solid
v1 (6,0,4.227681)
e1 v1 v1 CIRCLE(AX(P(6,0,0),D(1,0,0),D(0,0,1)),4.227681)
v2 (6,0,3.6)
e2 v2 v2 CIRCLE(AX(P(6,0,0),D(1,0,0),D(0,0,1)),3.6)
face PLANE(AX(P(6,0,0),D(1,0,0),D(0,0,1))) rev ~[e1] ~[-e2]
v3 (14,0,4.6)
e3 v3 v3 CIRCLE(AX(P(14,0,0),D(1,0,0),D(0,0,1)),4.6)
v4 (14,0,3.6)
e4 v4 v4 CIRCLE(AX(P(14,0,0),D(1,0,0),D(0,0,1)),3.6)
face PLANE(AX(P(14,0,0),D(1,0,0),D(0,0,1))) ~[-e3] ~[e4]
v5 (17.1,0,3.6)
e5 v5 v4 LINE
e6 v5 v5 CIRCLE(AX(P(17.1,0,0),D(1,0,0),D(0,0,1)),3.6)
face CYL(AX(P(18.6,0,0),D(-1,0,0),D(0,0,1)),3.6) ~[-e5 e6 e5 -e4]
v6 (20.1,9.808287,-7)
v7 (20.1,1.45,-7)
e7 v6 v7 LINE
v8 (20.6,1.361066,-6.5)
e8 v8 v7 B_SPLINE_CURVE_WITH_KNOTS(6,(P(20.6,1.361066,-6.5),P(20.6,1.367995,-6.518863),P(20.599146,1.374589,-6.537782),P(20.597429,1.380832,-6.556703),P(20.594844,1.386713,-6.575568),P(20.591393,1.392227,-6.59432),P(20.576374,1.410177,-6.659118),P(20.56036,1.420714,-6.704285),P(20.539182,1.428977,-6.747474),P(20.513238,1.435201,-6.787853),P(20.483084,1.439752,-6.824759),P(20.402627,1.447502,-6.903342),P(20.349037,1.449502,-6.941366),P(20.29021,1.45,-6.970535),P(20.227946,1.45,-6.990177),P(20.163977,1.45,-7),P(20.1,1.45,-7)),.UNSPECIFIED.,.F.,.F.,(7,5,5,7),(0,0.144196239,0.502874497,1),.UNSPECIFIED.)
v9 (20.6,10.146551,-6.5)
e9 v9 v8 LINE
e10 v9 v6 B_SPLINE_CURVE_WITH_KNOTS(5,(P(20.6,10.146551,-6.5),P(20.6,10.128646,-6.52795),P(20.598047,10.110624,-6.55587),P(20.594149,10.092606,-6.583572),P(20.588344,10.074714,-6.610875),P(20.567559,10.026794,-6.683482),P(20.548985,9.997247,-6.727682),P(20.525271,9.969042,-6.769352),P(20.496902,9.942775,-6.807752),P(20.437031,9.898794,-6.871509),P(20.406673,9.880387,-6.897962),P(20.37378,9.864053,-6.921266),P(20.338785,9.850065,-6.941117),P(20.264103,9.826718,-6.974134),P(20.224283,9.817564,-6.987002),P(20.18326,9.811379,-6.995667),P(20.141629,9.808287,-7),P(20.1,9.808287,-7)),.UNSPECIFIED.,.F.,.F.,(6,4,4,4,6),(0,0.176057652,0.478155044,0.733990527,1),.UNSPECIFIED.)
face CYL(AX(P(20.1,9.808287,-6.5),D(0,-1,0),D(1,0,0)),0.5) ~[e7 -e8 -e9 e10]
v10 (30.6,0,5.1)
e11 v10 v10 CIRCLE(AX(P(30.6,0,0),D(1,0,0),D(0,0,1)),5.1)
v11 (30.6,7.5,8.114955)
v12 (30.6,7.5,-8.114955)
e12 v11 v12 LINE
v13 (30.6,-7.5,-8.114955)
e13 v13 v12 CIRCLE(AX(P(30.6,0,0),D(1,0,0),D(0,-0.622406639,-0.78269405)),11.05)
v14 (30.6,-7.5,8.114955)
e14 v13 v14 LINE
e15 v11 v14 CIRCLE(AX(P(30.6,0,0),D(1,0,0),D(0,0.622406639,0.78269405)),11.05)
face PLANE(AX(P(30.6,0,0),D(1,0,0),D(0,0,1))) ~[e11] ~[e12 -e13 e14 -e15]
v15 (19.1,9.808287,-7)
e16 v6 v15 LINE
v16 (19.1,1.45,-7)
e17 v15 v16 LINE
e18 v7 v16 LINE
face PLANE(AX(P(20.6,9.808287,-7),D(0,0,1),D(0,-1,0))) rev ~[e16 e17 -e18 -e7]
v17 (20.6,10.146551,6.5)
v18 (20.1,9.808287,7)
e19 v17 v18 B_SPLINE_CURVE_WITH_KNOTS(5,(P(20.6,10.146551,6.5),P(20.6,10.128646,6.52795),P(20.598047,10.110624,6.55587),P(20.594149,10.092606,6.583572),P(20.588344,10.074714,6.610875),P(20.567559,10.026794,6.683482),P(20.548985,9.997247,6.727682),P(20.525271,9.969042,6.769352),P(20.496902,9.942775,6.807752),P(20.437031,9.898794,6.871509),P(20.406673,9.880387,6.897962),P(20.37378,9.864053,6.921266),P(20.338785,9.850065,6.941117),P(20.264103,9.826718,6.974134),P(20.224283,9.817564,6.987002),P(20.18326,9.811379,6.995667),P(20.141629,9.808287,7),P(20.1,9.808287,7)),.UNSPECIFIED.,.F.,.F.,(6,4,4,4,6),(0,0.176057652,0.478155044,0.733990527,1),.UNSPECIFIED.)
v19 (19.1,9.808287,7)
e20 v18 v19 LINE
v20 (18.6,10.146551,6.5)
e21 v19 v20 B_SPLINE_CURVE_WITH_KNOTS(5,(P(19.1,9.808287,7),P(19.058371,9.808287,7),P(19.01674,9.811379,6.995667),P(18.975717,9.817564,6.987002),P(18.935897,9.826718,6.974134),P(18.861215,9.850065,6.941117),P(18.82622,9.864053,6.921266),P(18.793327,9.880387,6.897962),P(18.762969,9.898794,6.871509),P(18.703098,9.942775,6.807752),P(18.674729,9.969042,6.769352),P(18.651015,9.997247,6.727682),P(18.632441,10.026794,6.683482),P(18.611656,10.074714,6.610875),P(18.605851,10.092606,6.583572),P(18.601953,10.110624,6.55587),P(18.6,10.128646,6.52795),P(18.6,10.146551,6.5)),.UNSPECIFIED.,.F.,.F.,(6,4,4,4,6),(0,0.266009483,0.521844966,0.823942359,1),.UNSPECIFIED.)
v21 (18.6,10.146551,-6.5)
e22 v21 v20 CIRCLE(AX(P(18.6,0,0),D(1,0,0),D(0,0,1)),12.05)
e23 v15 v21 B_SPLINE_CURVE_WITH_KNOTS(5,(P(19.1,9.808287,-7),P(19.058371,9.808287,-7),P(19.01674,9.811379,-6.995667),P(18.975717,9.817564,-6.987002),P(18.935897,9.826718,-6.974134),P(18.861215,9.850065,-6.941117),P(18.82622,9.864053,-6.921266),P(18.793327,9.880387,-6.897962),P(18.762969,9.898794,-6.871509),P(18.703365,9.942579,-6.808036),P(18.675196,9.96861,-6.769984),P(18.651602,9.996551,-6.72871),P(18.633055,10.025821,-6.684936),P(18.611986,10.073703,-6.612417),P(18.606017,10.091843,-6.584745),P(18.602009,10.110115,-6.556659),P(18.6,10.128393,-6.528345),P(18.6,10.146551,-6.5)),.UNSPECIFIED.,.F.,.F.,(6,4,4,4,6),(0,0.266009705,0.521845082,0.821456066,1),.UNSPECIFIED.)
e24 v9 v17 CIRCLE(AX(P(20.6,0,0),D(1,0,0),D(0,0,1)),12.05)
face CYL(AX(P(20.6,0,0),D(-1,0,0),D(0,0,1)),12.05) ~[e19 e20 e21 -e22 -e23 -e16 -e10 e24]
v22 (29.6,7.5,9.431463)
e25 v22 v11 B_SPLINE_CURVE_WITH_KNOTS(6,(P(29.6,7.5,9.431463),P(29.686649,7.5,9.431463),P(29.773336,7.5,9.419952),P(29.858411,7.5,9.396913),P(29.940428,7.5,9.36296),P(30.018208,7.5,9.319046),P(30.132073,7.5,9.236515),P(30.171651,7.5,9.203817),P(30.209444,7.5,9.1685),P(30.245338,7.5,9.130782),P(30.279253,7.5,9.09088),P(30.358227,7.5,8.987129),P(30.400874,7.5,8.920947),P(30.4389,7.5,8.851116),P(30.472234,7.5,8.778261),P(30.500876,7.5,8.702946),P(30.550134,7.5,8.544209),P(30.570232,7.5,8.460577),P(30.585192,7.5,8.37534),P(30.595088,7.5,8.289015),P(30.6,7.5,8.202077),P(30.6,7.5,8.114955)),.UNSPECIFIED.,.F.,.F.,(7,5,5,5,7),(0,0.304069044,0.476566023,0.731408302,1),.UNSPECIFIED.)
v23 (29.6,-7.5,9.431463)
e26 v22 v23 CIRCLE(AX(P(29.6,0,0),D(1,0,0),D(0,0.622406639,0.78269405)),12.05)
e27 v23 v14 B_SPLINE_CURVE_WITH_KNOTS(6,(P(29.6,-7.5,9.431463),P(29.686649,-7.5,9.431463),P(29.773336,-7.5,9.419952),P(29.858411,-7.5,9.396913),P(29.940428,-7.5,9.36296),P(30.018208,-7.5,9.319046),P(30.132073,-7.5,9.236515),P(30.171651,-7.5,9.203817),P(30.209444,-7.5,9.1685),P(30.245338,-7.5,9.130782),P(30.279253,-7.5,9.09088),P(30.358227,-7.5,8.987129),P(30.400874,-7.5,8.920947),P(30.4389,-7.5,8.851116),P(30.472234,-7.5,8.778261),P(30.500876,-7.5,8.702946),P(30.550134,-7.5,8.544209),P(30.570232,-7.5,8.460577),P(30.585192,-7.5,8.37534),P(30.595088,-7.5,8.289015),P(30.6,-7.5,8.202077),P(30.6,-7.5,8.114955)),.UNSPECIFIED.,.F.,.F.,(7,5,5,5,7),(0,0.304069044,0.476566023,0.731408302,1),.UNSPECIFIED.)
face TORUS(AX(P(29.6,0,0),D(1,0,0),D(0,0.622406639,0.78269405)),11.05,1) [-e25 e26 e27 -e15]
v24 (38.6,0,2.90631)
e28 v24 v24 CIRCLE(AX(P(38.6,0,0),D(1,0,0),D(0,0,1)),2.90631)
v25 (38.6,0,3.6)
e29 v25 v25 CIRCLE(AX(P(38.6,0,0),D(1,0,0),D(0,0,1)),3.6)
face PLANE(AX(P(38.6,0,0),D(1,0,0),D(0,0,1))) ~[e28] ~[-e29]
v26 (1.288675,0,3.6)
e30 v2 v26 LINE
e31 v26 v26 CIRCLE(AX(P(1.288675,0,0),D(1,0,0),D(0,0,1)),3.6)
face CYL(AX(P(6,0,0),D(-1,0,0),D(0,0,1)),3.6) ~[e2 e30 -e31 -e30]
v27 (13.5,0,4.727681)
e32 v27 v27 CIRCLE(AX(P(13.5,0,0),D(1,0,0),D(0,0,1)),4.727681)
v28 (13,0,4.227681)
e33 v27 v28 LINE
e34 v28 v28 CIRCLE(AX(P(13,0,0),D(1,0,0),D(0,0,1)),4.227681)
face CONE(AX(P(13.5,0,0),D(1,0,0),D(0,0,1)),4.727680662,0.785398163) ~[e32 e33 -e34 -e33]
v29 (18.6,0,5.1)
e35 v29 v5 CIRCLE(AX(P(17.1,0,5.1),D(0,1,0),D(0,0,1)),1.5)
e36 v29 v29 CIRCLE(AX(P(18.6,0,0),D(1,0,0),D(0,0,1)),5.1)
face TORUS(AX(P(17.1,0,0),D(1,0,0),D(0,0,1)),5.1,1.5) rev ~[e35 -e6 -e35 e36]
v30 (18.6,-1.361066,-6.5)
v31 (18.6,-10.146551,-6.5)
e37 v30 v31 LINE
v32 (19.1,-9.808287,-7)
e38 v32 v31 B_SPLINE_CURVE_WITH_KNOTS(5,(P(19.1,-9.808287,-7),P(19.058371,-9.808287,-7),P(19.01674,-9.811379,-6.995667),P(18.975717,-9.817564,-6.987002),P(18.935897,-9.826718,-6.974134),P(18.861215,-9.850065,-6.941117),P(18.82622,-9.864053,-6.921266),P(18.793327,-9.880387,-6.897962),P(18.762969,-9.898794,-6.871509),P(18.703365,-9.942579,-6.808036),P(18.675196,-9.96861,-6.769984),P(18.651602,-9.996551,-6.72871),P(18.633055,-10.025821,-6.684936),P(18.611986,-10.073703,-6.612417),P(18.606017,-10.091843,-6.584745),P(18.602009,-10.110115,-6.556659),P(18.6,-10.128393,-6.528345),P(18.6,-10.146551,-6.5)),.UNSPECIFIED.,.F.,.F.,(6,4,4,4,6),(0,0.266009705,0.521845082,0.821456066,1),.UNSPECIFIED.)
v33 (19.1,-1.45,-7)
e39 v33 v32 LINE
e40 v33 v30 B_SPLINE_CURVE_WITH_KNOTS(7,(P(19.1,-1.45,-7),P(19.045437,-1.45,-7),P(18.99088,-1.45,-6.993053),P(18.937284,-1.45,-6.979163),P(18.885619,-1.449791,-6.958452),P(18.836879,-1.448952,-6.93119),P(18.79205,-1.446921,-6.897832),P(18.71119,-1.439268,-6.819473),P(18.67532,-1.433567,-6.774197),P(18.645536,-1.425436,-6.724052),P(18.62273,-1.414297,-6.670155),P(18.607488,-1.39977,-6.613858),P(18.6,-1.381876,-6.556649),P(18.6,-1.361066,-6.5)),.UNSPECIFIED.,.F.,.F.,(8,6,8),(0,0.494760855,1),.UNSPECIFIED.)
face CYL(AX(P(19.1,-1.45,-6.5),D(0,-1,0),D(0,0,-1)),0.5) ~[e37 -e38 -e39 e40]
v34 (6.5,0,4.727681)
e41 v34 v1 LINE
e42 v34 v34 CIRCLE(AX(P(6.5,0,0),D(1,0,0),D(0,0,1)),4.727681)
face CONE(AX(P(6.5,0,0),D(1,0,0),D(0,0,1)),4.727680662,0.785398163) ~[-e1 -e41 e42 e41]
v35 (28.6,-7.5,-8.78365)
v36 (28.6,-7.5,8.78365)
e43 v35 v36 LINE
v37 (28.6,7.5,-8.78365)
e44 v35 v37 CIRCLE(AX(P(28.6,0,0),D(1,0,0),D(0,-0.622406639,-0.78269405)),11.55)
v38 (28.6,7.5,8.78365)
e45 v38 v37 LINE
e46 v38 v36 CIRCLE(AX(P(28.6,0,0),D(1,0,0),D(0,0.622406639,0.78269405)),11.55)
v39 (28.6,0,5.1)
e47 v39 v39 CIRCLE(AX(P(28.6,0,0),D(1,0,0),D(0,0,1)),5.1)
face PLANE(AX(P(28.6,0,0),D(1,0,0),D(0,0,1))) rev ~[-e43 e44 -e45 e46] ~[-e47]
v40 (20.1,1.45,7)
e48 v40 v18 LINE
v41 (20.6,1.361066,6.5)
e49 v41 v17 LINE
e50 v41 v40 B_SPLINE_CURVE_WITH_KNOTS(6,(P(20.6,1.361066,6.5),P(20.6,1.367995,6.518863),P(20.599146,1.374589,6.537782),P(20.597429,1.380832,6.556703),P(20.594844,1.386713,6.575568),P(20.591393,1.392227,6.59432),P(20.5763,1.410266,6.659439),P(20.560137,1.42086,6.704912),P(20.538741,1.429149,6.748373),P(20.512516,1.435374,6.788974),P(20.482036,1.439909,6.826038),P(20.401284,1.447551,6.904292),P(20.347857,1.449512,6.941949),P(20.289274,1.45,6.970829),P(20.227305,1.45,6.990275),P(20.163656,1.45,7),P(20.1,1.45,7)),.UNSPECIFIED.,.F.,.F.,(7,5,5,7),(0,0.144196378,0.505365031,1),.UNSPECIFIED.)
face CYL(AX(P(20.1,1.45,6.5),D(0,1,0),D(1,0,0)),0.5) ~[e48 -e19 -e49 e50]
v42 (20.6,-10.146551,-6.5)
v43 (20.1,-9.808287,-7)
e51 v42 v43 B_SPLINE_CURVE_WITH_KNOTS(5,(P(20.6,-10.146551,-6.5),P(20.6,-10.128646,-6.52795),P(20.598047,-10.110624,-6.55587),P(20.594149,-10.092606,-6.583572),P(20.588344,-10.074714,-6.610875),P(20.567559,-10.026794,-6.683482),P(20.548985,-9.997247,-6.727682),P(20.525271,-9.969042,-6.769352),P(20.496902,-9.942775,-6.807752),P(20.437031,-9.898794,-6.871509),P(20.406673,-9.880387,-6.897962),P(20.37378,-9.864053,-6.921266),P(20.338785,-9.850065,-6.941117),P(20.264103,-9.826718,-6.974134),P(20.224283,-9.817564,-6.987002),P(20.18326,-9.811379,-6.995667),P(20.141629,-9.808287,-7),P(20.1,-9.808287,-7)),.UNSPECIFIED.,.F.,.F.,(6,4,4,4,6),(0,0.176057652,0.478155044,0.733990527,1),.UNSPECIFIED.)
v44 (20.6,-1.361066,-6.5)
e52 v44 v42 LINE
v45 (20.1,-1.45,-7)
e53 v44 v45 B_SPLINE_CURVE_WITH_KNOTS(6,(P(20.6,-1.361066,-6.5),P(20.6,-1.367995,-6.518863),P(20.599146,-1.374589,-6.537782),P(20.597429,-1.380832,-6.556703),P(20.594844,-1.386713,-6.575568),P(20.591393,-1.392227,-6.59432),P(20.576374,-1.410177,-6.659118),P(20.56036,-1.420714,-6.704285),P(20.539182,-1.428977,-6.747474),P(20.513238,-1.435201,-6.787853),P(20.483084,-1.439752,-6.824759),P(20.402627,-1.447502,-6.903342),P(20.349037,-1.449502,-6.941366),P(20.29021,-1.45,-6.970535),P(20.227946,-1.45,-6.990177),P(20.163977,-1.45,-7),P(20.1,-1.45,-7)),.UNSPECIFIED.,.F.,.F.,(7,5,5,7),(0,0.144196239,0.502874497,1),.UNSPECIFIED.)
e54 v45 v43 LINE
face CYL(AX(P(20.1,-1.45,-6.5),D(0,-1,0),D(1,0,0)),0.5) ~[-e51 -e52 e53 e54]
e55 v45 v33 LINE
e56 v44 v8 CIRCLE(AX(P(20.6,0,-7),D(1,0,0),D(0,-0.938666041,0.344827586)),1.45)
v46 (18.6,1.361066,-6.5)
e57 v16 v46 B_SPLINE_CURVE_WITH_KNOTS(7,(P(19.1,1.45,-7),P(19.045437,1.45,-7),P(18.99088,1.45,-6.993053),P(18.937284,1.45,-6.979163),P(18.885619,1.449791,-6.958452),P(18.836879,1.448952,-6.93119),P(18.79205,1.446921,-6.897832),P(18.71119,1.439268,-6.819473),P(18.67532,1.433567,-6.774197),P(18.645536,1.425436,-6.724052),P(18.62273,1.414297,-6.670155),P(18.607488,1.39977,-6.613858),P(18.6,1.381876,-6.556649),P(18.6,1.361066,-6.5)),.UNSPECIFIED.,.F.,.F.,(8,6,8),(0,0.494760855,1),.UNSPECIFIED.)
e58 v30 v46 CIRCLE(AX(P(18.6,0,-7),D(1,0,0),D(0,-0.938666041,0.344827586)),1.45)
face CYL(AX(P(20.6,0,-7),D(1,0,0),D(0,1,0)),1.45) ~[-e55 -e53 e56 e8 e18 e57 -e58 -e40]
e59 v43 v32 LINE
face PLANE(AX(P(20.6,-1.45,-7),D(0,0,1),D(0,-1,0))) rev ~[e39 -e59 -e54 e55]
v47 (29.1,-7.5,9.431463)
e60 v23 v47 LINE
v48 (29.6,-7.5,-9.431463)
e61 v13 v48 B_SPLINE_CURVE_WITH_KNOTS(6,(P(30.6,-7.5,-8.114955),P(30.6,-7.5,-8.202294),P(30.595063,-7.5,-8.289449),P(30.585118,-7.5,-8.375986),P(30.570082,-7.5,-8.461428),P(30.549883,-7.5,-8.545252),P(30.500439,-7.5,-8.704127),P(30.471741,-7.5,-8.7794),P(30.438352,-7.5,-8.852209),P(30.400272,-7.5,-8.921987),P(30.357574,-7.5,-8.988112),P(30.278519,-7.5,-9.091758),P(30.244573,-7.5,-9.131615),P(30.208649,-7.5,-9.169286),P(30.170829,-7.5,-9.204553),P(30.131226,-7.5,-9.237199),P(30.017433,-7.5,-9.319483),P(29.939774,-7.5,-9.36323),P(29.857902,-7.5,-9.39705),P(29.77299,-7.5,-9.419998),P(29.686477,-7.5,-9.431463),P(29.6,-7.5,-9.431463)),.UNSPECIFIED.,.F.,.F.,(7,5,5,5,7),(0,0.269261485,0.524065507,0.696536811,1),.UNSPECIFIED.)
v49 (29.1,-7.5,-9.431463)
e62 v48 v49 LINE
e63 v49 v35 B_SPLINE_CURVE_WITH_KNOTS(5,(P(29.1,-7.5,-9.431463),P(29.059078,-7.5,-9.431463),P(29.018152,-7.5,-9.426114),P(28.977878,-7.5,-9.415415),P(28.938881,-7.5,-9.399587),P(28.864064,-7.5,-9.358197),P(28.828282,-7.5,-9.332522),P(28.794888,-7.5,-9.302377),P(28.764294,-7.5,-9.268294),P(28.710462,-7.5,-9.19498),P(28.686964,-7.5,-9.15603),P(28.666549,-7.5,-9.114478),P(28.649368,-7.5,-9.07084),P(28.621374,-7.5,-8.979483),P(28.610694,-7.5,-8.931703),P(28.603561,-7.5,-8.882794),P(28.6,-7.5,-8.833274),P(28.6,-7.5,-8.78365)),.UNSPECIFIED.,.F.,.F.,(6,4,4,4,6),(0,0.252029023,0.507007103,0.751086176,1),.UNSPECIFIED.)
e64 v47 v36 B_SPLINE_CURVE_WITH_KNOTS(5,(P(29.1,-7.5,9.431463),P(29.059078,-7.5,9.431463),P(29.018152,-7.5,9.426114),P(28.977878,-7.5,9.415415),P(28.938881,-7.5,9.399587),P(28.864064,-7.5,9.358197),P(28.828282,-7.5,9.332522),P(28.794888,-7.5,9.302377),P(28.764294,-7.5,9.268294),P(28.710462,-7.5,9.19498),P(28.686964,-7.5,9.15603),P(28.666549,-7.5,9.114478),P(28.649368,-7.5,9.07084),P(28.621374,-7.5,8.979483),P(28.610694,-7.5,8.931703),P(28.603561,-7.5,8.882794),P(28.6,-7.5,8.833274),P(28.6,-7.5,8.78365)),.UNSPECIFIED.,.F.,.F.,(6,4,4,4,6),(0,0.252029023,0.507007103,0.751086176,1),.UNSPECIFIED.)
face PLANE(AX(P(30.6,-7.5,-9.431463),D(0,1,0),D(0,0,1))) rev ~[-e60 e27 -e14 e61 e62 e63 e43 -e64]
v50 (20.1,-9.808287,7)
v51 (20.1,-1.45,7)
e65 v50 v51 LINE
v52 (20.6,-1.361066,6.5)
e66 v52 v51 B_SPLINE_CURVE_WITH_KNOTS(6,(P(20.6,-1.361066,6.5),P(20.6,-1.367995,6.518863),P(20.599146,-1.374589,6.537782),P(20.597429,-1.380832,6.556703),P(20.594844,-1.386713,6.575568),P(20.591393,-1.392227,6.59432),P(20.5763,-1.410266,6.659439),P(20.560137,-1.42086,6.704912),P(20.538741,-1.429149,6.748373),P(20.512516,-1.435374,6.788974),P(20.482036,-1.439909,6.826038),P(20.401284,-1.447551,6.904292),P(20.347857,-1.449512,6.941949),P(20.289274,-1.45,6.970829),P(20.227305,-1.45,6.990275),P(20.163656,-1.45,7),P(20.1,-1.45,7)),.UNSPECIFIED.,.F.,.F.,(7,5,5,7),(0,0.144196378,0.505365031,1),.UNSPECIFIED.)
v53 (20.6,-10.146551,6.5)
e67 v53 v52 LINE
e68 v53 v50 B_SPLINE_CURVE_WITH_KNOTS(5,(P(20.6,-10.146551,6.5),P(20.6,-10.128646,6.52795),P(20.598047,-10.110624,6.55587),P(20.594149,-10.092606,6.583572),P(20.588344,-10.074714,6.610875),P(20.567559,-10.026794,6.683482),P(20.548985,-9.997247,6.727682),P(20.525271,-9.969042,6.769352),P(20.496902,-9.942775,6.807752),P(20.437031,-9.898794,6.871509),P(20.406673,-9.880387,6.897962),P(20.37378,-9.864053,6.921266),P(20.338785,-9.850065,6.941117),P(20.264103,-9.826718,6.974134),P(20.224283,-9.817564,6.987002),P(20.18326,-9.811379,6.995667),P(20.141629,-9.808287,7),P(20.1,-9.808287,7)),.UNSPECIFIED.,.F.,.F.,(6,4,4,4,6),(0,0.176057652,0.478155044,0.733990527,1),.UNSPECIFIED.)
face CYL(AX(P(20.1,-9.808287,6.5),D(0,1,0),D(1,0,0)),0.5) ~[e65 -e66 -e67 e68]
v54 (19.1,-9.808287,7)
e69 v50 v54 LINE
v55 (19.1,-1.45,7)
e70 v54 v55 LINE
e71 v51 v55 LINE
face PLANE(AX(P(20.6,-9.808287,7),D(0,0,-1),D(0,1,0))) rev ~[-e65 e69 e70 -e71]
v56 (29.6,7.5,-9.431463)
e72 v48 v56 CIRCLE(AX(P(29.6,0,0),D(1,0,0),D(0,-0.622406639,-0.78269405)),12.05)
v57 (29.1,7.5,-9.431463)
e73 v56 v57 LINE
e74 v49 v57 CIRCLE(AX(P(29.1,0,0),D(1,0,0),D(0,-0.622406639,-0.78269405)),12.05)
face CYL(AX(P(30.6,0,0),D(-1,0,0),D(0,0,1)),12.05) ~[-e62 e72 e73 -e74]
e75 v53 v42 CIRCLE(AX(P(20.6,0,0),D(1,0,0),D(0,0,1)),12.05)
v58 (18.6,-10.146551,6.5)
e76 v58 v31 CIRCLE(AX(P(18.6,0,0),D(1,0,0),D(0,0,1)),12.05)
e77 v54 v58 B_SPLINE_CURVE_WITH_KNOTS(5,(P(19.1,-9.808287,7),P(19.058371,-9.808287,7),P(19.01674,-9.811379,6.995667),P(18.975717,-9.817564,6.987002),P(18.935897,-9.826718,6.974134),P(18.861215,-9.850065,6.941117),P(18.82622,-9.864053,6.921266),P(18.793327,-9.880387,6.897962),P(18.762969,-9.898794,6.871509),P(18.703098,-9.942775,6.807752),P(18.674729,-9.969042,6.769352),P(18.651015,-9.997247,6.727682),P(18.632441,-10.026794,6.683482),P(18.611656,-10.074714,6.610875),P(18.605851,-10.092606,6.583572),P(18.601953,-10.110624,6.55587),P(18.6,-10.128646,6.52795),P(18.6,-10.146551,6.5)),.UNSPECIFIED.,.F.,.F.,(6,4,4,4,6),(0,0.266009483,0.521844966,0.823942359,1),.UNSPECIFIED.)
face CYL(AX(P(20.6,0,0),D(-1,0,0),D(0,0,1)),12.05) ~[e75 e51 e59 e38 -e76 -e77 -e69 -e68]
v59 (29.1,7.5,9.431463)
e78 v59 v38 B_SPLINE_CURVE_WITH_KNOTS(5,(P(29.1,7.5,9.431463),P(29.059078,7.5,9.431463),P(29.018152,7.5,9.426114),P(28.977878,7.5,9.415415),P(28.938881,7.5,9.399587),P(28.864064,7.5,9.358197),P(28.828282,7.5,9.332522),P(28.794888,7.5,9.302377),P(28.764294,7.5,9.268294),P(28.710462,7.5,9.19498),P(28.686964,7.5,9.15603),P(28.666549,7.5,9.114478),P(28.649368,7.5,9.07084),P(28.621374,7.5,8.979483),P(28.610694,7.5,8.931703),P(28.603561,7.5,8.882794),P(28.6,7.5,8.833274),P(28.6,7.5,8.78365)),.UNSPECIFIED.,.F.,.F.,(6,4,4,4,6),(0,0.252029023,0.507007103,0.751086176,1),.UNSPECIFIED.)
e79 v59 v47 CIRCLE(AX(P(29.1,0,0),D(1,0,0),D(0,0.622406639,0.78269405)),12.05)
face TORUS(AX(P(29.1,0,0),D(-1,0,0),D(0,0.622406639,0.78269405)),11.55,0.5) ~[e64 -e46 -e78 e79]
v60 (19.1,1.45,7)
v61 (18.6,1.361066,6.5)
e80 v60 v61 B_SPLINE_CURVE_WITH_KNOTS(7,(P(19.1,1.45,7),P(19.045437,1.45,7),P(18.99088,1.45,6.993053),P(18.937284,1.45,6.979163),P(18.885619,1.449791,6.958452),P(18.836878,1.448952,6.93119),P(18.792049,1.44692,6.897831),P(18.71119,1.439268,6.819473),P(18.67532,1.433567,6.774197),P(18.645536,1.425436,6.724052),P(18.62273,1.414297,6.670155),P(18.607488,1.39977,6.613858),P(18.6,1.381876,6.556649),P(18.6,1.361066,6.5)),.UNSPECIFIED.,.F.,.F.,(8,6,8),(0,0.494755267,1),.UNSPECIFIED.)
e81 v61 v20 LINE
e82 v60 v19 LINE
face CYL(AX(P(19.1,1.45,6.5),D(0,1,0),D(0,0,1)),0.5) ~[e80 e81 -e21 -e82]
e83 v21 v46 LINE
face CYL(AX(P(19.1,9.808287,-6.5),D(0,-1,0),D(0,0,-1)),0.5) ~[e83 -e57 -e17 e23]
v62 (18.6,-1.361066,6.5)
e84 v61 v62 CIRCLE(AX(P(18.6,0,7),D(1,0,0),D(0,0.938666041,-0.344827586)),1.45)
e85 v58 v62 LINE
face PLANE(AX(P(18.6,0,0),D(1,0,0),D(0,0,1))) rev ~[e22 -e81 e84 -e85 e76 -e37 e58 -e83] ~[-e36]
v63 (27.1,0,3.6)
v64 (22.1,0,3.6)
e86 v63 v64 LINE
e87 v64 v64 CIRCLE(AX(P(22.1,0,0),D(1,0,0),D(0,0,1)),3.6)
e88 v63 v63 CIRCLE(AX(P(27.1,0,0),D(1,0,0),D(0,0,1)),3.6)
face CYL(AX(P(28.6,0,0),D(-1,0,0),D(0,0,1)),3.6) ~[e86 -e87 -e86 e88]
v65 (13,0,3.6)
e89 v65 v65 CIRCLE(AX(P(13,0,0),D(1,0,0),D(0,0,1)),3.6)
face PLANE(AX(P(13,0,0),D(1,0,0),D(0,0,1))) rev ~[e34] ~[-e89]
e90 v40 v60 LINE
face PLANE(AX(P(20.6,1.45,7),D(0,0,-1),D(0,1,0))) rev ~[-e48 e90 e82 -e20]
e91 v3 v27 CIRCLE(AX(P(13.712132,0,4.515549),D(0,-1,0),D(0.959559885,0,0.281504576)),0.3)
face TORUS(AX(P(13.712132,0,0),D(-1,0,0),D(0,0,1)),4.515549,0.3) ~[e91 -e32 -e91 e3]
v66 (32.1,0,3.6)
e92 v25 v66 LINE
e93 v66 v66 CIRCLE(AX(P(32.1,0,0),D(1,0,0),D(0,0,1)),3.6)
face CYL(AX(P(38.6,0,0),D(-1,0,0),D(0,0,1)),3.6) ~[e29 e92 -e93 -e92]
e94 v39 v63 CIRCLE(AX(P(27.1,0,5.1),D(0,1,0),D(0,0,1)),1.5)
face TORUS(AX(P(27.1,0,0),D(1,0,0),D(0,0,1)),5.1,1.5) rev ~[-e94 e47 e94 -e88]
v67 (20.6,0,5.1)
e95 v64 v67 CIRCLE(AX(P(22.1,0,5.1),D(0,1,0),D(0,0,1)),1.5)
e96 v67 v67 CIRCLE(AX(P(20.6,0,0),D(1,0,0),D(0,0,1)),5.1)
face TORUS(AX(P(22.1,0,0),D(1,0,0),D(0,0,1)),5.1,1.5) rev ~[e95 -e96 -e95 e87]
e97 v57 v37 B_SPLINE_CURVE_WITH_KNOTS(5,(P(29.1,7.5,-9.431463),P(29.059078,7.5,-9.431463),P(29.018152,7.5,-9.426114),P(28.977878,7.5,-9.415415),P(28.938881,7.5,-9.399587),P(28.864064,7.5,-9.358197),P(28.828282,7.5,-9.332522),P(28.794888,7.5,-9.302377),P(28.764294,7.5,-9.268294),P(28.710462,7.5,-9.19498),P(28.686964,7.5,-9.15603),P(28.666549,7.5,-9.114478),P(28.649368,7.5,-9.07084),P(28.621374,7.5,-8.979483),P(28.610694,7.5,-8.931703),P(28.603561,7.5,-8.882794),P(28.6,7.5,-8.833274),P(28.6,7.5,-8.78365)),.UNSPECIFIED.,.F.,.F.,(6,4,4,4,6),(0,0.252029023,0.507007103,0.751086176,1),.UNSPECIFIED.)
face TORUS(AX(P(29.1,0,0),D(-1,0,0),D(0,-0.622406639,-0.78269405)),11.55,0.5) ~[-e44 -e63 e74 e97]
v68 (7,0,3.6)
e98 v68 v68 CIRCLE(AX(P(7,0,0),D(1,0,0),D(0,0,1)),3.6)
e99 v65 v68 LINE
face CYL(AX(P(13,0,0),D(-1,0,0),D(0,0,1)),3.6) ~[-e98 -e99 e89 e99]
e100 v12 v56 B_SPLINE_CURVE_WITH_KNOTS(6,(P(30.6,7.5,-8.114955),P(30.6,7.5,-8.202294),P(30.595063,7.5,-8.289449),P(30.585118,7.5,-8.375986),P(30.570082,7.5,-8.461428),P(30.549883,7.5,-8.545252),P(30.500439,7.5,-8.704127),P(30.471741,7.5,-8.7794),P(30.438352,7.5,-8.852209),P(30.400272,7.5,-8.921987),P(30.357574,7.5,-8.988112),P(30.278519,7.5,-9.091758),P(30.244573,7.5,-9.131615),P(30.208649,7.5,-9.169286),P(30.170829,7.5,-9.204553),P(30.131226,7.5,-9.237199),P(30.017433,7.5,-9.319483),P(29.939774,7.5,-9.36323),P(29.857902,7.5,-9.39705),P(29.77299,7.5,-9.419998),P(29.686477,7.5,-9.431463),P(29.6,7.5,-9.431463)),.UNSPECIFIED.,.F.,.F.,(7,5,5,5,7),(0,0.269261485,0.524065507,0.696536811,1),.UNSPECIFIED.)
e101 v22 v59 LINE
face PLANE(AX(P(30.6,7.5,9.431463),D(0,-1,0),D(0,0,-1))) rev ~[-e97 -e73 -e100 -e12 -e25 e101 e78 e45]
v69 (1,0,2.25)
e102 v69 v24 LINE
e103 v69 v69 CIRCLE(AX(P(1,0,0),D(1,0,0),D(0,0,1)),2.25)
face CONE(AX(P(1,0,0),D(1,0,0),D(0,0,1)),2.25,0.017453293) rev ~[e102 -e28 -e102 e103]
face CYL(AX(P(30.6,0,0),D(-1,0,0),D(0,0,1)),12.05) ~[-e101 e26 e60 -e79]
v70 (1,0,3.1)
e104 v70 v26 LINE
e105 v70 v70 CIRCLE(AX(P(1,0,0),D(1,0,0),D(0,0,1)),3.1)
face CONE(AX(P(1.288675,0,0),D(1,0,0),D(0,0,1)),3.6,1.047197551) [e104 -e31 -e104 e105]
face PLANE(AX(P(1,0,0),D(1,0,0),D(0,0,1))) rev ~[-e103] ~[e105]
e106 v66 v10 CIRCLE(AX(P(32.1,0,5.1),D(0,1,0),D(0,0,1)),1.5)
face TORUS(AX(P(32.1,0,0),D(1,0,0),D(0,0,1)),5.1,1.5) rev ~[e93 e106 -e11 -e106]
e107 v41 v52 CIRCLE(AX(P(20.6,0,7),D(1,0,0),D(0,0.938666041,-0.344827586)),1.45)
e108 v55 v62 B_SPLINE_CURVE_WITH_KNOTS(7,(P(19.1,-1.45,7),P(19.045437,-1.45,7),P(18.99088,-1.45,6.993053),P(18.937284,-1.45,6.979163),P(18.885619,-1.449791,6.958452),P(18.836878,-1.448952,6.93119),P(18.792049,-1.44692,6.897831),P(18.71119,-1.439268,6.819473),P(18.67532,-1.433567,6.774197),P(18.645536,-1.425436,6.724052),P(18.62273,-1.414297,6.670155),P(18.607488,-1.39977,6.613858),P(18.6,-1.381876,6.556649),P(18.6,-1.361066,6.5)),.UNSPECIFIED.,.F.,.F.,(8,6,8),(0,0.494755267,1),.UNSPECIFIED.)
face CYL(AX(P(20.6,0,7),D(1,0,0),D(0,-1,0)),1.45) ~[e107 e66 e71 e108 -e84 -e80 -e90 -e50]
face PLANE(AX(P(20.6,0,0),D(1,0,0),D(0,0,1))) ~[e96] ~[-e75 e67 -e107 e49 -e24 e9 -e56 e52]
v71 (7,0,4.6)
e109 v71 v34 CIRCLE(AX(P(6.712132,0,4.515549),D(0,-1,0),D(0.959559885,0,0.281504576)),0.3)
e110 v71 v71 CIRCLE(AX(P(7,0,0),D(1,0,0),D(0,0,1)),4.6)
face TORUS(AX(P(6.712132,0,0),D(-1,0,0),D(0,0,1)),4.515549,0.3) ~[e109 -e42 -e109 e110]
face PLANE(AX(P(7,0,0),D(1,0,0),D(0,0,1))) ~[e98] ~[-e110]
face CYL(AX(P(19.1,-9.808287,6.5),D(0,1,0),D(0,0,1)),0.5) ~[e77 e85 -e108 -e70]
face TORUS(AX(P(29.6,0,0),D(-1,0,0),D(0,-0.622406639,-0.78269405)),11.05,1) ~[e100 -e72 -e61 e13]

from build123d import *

# Parameters (mm, degrees)
F2_R     = 1.5
F3_SIZE2 = 0.2886751346
F3_SIZE  = 0.5
F5_DEPTH = 3.9
F7_DEPTH = 5
F8_R     = 0.5
F9_R     = 1
F10_R    = 0.5


with BuildPart() as f1:
    # F0 (on Front) → F1 (revolve)
    with BuildSketch(Plane.XZ):
        with BuildLine():
            Line((6, 3.6), (1, 3.6))
            Line((1, 3.6), (1, 2.25))
            Line((1, 2.25), (38.6, 2.9063104413))
            Line((38.6, 2.9063104413), (38.6, 3.6))
            Line((38.6, 3.6), (30.6, 3.6))
            Line((30.6, 3.6), (30.6, 12.05))
            Line((30.6, 12.05), (28.6, 12.05))
            Line((28.6, 12.05), (28.6, 3.6))
            Line((28.6, 3.6), (20.6, 3.6))
            Line((20.6, 3.6), (20.6, 12.05))
            Line((20.6, 12.05), (18.6, 12.05))
            Line((18.6, 12.05), (18.6, 3.6))
            Line((18.6, 3.6), (14, 3.6))
            Line((14, 3.6), (14, 4.6))
            ThreePointArc((14, 4.6), (13.7863585166, 4.8062210018), (13.5, 4.7276806616))
            Line((13.5, 4.7276806616), (13, 4.2276806616))
            Line((13, 4.2276806616), (13, 3.6))
            Line((13, 3.6), (7, 3.6))
            Line((7, 3.6), (7, 4.6))
            ThreePointArc((7, 4.6), (6.7863585166, 4.8062210018), (6.5, 4.7276806616))
            Line((6.5, 4.7276806616), (6, 4.2276806616))
            Line((6, 4.2276806616), (6, 3.6))
        make_face()
    revolve(axis=Axis((21.4299485087, 0, 0), (1, 0, 0)))

    # F2
    f2_edges = [f1.edges().sort_by_distance(p)[0] for p in [
        (18.6, 0, -3.6),
        (20.6, 0, -3.6),
        (28.6, 0, -3.6),
        (30.6, 0, -3.6),
    ]]
    fillet(f2_edges, radius=F2_R)

    # F3
    f3_edges = [f1.edges().sort_by_distance(p)[0] for p in [
        (1, 0, -3.6),
    ]]
    chamfer(f3_edges, length=F3_SIZE, length2=F3_SIZE2)

    # F4 (on face) → F5 (cut)
    with BuildSketch(Plane.YZ.offset(30.6)):
        with BuildLine():
            ThreePointArc((12.05, 0), (10.853052566, 5.2358141678), (7.5, 9.4314633011))
            Line((7.5, 9.4314633011), (7.5, -9.4314633011))
            ThreePointArc((7.5, -9.4314633011), (10.853052566, -5.2358141678), (12.05, 0))
        make_face()
        with BuildLine():
            Line((-7.5, -9.4314633011), (-7.5, 9.4314633011))
            ThreePointArc((-7.5, 9.4314633011), (-12.05, 0), (-7.5, -9.4314633011))
        make_face()
    extrude(amount=-F5_DEPTH, mode=Mode.SUBTRACT)

    # F6 (on face) → F7 (cut)
    with BuildSketch(Plane.YZ.offset(20.6)):
        with BuildLine():
            Line((-9.8082873123, 7), (-1.45, 7))
            ThreePointArc((-1.45, 7), (0, 8.45), (1.45, 7))
            Line((1.45, 7), (9.8082873123, 7))
            ThreePointArc((9.8082873123, 7), (0, 12.05), (-9.8082873123, 7))
        make_face()
        with BuildLine():
            Line((-1.45, -7), (-9.8082873123, -7))
            ThreePointArc((-9.8082873123, -7), (0, -12.05), (9.8082873123, -7))
            Line((9.8082873123, -7), (1.45, -7))
            ThreePointArc((1.45, -7), (0, -8.45), (-1.45, -7))
        make_face()
    extrude(amount=-F7_DEPTH, mode=Mode.SUBTRACT)

    # F8
    f8_edges = [f1.edges().sort_by_distance(p)[0] for p in [
        (28.6, 0, -12.05),
        (28.6, 0, 12.05),
    ]]
    fillet(f8_edges, radius=F8_R)

    # F9
    f9_edges = [f1.edges().sort_by_distance(p)[0] for p in [
        (30.6, 0, 12.05),
        (30.6, 0, -12.05),
    ]]
    fillet(f9_edges, radius=F9_R)

    # F10
    f10_edges = [f1.edges().sort_by_distance(p)[0] for p in [
        (18.6, 5.629144, 7),
        (20.6, 5.629144, 7),
        (20.6, -5.629144, 7),
        (18.6, -5.629144, 7),
        (18.6, 5.629144, -7),
        (20.6, 5.629144, -7),
        (18.6, -5.629144, -7),
        (20.6, -5.629144, -7),
    ]]
    fillet(f10_edges, radius=F10_R)


solid = f1.part
